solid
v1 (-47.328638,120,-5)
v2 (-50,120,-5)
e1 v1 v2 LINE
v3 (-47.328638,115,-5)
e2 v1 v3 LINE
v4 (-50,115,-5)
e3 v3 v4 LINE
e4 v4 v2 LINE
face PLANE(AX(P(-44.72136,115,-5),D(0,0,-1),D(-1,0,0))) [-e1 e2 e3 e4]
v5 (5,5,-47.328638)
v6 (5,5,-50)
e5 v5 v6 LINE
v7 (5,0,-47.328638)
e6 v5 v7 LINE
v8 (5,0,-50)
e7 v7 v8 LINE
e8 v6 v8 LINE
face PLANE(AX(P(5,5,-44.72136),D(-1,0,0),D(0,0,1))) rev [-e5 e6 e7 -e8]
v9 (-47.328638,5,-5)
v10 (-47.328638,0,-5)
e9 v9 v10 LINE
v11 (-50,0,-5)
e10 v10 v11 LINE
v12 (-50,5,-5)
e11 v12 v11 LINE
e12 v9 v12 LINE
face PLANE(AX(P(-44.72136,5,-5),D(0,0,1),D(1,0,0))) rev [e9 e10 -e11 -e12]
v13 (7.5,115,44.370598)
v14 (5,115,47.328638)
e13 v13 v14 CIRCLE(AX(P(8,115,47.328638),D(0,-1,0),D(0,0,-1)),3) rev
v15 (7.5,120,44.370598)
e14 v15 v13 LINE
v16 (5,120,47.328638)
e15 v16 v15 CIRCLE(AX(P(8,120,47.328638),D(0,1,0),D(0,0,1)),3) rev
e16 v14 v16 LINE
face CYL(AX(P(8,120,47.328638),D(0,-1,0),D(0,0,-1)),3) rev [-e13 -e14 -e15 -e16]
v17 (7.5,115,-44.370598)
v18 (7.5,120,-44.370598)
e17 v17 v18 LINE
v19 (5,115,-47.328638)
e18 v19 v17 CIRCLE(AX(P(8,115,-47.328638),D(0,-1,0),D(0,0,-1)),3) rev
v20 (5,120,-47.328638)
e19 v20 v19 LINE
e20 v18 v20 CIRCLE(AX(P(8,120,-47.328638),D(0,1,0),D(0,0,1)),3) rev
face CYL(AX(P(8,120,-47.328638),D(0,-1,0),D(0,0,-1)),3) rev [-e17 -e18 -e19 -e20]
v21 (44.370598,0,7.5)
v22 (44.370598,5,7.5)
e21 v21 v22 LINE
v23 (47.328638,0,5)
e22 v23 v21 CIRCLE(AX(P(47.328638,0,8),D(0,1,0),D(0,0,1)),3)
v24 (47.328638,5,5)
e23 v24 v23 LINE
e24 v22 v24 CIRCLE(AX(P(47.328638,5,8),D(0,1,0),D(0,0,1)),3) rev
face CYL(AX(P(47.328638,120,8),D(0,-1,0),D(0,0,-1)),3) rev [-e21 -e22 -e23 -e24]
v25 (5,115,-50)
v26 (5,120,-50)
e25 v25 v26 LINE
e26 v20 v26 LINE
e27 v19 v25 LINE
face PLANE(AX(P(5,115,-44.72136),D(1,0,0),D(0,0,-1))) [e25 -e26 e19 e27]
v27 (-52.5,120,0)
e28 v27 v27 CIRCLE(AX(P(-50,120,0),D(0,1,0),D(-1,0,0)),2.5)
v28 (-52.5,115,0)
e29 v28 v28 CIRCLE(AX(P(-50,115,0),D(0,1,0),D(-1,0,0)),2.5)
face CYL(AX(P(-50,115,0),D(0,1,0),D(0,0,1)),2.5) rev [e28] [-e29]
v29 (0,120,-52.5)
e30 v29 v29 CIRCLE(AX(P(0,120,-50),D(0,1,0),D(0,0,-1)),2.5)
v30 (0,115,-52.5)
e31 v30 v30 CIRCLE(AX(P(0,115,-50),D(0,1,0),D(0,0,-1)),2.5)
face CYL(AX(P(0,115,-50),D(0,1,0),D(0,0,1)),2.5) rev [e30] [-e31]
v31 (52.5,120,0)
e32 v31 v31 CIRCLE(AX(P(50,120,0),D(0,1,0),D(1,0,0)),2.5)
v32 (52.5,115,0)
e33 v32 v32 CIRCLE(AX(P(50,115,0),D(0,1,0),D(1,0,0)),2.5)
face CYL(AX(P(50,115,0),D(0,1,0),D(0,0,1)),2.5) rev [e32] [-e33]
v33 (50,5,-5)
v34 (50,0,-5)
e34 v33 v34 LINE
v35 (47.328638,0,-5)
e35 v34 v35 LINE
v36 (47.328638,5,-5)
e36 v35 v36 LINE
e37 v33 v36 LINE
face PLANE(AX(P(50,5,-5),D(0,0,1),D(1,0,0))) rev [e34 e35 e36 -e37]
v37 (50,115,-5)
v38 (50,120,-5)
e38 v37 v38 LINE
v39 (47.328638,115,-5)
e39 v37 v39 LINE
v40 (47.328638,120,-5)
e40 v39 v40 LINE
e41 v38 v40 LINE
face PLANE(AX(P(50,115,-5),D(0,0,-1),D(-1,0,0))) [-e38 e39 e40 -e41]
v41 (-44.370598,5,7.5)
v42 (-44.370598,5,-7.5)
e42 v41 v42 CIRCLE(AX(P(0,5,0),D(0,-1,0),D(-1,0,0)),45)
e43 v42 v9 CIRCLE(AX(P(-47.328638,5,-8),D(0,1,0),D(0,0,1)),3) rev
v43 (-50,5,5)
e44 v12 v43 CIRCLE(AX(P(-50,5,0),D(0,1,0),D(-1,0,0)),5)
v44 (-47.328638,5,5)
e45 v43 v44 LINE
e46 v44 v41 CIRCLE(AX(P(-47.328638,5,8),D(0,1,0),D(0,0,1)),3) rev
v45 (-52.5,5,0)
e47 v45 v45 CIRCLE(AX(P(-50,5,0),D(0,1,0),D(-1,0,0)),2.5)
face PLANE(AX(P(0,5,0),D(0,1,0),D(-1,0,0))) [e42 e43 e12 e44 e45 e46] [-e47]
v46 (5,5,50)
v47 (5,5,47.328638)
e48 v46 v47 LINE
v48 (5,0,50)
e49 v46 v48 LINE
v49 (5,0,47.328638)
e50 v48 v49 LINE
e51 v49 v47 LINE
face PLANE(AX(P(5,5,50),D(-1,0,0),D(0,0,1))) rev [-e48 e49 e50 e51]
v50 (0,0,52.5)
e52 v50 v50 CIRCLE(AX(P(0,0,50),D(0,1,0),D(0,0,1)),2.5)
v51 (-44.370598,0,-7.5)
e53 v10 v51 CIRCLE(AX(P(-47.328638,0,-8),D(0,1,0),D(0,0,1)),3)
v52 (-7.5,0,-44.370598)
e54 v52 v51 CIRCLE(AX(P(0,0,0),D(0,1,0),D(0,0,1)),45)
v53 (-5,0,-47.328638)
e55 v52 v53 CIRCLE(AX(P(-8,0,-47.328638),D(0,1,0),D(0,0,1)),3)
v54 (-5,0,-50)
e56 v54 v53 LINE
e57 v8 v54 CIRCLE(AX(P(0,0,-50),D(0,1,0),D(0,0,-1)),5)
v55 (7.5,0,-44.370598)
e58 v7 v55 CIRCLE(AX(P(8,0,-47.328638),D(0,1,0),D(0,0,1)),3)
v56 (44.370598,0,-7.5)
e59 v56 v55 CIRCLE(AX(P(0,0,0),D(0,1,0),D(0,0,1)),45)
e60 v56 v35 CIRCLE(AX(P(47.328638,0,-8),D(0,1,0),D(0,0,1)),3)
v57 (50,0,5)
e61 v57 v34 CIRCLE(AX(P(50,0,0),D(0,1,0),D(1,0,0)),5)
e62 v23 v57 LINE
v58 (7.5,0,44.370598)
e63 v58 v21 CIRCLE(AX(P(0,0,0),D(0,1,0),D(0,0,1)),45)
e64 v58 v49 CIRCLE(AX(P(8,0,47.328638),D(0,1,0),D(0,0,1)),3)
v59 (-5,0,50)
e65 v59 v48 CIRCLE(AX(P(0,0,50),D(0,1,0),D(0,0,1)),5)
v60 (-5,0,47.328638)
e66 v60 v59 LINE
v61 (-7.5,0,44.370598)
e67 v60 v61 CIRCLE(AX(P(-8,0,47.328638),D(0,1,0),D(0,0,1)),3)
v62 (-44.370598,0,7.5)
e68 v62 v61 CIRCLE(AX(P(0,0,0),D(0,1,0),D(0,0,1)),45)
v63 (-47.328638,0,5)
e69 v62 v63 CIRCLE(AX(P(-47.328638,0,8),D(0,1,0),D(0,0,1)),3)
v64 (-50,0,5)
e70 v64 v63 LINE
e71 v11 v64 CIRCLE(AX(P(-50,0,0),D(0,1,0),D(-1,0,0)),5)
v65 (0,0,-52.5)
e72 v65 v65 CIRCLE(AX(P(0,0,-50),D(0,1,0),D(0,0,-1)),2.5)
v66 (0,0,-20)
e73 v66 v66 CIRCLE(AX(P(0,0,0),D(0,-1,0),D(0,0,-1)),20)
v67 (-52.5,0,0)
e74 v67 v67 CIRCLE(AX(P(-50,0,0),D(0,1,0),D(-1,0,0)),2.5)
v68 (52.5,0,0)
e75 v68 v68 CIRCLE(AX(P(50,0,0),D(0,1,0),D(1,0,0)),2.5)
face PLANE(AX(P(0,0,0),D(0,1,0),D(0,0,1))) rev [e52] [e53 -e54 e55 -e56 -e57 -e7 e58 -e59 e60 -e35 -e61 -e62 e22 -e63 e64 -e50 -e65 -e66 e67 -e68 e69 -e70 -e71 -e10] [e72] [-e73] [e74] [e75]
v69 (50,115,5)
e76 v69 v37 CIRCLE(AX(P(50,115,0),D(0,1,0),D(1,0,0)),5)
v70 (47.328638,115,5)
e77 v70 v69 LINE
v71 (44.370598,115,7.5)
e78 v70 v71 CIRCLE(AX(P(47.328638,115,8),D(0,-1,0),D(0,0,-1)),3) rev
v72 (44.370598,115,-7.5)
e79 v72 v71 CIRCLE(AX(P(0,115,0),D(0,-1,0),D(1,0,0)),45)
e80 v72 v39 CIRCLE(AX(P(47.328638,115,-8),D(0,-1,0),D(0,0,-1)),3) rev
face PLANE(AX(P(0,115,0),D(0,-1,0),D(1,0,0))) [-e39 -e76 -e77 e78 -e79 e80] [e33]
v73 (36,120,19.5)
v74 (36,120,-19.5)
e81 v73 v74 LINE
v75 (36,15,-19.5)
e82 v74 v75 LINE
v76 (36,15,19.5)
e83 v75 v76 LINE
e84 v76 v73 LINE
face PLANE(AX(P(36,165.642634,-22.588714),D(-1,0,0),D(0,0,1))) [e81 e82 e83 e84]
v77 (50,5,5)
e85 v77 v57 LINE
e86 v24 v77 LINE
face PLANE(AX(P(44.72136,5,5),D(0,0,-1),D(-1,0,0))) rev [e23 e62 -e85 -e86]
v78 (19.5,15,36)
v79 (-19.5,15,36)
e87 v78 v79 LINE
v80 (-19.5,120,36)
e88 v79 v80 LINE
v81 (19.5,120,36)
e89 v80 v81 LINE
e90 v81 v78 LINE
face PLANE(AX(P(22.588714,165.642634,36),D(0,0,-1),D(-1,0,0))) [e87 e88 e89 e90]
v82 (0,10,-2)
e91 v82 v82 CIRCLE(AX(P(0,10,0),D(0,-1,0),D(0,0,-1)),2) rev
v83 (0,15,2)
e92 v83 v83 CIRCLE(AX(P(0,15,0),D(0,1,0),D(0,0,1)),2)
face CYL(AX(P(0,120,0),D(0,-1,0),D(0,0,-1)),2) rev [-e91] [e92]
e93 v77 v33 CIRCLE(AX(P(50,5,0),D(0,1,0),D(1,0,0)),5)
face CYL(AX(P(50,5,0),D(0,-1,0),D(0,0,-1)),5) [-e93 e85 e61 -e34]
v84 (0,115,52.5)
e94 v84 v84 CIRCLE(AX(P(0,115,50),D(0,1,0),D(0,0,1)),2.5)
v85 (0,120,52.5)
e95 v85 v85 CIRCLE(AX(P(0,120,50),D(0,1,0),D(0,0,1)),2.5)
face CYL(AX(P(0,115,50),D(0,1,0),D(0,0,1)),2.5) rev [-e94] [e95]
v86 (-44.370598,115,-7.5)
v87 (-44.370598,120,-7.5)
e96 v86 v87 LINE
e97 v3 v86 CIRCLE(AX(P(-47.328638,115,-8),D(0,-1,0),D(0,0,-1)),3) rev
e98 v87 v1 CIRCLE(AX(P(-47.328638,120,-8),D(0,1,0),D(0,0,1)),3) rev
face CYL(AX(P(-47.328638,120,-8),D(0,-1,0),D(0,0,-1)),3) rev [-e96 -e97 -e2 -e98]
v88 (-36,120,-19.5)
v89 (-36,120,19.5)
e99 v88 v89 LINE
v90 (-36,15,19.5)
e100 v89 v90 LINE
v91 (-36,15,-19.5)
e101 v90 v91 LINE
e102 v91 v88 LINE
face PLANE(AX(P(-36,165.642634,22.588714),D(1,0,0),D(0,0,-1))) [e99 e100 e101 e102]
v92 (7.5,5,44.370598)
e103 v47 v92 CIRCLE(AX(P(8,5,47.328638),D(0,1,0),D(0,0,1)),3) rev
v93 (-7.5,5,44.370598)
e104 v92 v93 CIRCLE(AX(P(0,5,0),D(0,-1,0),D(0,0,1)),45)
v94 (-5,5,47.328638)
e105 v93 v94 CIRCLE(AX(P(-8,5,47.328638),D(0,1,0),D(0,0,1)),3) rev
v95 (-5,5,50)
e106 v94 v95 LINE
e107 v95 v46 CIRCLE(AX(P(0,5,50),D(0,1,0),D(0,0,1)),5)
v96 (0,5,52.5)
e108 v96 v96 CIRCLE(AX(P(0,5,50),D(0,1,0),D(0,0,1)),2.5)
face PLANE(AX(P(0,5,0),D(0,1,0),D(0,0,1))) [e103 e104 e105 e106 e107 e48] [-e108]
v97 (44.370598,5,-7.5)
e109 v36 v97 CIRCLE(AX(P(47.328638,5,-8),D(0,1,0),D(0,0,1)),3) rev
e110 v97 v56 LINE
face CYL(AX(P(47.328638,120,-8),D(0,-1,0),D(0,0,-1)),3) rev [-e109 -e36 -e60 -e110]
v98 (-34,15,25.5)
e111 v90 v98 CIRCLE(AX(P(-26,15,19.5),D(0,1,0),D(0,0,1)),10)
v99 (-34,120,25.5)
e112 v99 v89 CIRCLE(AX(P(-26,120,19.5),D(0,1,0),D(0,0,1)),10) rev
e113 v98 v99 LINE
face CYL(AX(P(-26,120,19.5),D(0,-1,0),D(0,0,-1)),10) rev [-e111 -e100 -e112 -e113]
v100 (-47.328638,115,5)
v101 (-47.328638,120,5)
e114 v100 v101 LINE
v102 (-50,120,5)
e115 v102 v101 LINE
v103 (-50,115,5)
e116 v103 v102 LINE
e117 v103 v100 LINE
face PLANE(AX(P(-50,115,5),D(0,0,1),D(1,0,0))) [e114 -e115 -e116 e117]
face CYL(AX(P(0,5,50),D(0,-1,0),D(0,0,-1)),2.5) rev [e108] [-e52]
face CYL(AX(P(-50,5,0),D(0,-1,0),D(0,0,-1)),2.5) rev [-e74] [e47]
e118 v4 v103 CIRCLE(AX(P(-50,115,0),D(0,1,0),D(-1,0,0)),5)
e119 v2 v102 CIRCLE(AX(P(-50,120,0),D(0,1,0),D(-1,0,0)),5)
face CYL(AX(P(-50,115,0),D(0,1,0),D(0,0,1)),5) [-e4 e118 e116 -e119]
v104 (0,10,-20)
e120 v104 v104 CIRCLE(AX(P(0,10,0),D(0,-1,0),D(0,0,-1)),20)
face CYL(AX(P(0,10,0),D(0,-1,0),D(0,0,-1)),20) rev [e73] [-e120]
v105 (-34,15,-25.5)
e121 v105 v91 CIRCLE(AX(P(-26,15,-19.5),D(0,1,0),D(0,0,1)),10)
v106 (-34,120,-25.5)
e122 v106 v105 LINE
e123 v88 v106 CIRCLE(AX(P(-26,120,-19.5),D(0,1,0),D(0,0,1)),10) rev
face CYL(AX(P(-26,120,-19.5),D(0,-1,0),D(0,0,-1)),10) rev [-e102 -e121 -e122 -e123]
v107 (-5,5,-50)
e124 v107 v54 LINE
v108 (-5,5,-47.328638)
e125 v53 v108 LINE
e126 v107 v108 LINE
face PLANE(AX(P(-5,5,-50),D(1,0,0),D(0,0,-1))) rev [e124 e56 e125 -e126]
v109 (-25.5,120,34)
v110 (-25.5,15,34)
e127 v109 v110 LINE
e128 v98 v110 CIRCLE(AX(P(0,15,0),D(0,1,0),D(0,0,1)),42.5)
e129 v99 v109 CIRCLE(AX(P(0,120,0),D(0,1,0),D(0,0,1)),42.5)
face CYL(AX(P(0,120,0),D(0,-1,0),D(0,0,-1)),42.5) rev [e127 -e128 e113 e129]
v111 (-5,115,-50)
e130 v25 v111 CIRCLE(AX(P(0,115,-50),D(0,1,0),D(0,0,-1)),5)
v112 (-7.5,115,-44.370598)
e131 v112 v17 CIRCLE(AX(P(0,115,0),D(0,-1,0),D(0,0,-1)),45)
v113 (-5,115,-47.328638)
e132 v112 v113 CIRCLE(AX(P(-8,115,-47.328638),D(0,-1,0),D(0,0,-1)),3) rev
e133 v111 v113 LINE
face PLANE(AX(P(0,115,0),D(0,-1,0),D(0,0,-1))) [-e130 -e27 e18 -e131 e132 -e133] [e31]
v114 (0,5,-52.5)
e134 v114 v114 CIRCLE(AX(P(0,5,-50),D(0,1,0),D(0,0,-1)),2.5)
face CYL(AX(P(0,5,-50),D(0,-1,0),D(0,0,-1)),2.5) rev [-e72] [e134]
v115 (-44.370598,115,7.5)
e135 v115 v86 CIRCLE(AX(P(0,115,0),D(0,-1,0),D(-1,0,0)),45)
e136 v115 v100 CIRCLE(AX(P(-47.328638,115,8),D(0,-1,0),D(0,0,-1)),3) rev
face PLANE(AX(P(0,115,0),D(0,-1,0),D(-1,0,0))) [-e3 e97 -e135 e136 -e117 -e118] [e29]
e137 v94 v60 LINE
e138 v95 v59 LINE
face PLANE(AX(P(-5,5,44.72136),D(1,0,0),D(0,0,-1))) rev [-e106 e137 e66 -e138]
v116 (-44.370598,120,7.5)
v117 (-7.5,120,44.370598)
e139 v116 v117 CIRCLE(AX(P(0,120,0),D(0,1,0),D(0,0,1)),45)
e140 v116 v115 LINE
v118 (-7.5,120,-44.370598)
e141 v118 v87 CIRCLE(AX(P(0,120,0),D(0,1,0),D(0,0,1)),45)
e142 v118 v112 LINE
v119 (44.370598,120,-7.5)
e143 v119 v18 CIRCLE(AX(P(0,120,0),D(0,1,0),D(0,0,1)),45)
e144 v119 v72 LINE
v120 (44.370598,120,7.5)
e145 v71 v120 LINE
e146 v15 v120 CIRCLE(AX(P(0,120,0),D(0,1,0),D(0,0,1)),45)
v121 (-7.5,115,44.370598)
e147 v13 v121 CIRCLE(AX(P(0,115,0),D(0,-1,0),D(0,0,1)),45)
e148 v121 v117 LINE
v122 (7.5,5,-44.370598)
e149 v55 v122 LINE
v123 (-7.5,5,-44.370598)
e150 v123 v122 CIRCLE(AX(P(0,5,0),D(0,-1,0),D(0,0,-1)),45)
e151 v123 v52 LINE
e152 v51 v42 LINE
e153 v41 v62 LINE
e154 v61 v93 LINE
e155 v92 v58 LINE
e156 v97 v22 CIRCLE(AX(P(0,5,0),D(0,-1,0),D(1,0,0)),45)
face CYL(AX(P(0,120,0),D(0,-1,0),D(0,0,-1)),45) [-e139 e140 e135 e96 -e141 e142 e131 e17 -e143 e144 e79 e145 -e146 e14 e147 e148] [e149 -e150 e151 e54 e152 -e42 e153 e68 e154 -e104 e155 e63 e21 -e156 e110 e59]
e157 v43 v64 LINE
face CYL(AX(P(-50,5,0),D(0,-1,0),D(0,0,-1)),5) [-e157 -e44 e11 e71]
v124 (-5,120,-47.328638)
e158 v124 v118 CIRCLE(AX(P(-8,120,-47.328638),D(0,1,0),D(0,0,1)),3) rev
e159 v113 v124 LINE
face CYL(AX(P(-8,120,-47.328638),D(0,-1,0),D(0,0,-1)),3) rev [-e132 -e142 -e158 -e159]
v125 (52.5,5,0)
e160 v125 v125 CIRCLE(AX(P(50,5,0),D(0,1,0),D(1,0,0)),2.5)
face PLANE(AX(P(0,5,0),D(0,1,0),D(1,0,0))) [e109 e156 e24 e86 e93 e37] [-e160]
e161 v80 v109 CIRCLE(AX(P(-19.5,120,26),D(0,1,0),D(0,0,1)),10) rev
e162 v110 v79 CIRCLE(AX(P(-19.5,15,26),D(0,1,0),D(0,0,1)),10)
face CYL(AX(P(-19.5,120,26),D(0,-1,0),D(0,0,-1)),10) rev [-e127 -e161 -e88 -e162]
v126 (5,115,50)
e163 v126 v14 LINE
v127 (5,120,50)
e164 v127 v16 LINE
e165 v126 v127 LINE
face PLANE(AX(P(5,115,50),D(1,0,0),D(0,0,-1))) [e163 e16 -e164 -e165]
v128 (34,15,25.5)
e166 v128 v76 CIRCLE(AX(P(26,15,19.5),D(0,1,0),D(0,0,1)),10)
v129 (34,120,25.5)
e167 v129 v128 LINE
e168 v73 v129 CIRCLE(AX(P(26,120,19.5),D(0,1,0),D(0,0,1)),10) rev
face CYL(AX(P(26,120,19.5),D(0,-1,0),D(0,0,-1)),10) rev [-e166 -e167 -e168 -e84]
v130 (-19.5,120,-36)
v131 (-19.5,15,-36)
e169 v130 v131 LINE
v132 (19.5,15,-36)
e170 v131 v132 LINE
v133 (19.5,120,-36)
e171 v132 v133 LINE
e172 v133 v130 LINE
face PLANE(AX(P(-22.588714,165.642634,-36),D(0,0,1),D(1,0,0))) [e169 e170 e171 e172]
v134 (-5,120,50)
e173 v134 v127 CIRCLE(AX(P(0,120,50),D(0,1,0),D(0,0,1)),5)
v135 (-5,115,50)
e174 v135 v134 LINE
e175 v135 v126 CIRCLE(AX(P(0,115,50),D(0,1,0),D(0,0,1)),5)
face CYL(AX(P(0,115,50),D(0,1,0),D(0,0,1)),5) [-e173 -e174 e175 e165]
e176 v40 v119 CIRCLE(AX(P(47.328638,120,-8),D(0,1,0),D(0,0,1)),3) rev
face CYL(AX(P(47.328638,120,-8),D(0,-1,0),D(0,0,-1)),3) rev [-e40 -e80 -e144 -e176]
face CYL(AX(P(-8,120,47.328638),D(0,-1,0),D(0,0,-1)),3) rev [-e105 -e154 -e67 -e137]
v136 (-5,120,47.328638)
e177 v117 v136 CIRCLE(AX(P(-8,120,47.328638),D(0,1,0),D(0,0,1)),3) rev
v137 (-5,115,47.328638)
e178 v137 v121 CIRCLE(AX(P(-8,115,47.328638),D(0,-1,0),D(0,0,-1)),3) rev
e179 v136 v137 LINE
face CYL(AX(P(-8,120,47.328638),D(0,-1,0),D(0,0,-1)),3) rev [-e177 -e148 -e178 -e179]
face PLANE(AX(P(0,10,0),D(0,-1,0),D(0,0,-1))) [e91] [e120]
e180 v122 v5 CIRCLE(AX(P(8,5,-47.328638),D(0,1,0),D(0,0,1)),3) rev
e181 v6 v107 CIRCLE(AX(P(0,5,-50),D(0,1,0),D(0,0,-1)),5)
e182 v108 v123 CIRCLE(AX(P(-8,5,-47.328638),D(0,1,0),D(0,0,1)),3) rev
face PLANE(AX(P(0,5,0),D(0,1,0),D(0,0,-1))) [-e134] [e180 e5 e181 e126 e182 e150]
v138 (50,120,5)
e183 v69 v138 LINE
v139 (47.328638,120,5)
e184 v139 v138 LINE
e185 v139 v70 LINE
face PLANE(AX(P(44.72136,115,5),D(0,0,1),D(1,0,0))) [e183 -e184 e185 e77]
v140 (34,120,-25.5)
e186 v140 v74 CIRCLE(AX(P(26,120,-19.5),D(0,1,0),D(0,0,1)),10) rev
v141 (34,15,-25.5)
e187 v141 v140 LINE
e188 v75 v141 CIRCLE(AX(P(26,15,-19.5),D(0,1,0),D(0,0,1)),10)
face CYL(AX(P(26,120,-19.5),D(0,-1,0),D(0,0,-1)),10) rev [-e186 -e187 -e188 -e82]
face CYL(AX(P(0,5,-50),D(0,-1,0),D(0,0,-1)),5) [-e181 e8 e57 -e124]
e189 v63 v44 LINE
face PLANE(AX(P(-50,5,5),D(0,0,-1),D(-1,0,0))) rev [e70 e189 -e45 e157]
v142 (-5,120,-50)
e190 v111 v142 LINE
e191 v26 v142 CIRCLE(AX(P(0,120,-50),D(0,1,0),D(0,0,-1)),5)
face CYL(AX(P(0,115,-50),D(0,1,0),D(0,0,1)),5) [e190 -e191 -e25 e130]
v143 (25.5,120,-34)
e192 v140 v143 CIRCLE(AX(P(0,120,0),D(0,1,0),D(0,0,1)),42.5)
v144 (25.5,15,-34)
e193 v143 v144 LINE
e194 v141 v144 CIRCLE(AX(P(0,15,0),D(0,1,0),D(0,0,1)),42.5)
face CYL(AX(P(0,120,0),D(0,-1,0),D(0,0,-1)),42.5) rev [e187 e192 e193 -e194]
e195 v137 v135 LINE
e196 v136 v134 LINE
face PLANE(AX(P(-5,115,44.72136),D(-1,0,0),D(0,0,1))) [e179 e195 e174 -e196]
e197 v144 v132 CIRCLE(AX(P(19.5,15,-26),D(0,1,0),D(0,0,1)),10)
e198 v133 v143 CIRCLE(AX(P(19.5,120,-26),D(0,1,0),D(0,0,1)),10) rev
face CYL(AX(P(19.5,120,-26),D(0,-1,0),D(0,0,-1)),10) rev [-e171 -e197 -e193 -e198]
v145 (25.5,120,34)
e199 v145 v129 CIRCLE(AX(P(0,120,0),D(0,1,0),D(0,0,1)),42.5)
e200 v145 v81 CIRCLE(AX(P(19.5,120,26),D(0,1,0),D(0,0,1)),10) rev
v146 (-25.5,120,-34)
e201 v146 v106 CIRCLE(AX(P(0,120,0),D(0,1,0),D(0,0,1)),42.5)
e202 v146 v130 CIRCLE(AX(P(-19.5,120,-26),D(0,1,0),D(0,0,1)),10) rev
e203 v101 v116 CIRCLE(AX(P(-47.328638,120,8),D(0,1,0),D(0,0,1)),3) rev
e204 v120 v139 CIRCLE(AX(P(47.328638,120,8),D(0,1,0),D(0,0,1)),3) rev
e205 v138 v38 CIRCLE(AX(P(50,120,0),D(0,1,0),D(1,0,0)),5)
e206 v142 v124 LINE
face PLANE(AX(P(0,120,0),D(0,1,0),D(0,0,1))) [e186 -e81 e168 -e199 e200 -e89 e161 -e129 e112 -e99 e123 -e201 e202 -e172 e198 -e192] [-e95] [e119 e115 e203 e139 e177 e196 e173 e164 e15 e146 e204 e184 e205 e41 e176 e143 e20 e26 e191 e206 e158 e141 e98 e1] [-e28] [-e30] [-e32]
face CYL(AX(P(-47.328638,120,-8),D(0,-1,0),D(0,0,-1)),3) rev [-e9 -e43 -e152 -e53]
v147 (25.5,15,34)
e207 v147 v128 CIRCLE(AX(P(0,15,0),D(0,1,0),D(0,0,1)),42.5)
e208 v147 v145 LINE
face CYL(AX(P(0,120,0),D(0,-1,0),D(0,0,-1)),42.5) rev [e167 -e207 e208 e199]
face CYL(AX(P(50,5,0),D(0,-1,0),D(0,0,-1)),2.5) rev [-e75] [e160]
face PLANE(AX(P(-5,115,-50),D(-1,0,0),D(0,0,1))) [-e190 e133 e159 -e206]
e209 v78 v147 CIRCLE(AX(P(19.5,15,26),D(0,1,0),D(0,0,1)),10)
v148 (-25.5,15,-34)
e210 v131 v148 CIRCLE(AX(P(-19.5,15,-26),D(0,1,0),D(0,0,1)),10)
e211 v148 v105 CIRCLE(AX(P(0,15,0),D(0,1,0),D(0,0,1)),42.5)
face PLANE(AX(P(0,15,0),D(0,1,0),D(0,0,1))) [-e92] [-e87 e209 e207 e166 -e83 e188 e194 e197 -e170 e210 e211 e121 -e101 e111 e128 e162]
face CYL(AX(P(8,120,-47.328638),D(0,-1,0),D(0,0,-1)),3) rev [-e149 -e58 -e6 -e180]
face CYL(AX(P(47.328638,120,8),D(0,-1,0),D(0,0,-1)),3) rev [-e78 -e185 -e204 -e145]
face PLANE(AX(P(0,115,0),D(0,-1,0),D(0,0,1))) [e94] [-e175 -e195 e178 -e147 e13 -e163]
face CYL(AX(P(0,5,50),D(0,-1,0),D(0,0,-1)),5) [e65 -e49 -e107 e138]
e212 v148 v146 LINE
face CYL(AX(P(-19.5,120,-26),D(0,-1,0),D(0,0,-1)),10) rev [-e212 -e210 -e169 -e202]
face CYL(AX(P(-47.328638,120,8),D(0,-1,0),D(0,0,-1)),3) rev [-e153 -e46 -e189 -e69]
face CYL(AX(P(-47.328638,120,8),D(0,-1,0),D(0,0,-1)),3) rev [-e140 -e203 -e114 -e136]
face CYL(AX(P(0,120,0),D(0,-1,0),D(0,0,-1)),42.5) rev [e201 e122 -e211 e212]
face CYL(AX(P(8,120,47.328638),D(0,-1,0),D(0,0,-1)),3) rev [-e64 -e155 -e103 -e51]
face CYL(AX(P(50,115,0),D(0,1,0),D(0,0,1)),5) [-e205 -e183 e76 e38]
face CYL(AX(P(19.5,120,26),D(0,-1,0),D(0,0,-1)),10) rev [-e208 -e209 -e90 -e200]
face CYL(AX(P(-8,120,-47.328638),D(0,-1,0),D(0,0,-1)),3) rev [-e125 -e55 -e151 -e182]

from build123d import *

# Parameters (mm, degrees)
SKETCH1_R                = 45
SKETCH1_R_2              = 42.5
BOSS_EXTRUDE1_DEPTH      = 120
SKETCH2_R                = 2.5
BOSS_EXTRUDE2_DEPTH      = 5
FILLET2_R                = 3
CIRPATTERN1_COUNT        = 4
FILLET2_OF_CIRPATTERN1_R = 3
MIRROR1_START            = 115
MIRROR1_OUTLINE_R        = 2.5
MIRROR1_DEPTH            = 5
SKETCH1_2_R              = 42.5
BOSS_EXTRUDE4_DEPTH      = 15
SKETCH7_R                = 2
CUT_EXTRUDE1_DEPTH       = 144.003496461
SKETCH10_R               = 20
CUT_EXTRUDE5_DEPTH       = 10
BOSS_EXTRUDE3_DEPTH      = 120
CIRPATTERN2_COUNT        = 4
FILLET1_R                = 10


# Read off the part's stored shape, not the designer's step: Mirror1
with BuildPart() as part:
    # Sketch1 → Boss-Extrude1 (new body)
    with BuildSketch(Plane(origin=(0, 0, 0), x_dir=(1, 0, 0), z_dir=(0, 1, 0))):
        with Locations(Location((0, 0, 0), (0, 0, 270))):
            Circle(SKETCH1_R)
        with Locations(Location((0, 0, 0), (0, 0, 270))):
            Circle(SKETCH1_R_2, mode=Mode.SUBTRACT)
    extrude(amount=BOSS_EXTRUDE1_DEPTH)

    # Sketch2 → Boss-Extrude2 (add)
    with BuildSketch(Plane(origin=(0, 0, 0), x_dir=(1, 0, 0), z_dir=(0, 1, 0))):
        with BuildLine():
            Line((-5, -44.72135955), (-5, -50))
            ThreePointArc((-5, -50), (0, -55), (5, -50))
            Line((5, -50), (5, -44.72135955))
            ThreePointArc((5, -44.72135955), (0, -45), (-5, -44.72135955))
        make_face()
        with Locations(Location((0, -50, 0), (0, 0, 270))):
            Circle(SKETCH2_R, mode=Mode.SUBTRACT)
    boss_extrude2 = extrude(amount=BOSS_EXTRUDE2_DEPTH)

    # Fillet2
    fillet2_edges = [part.edges().sort_by_distance(p)[0] for p in [
        (5, 2.5, 44.72135955),
        (-5, 2.5, 44.72135955),
    ]]
    fillet(fillet2_edges, radius=FILLET2_R)

    # CirPattern1: Boss-Extrude2 ×4 about axis
    cirpattern1_axis = Axis((0, 0, 0), (0, 1, 0))
    for i in range(1, CIRPATTERN1_COUNT):
        add(boss_extrude2.rotate(cirpattern1_axis, i * 360 / CIRPATTERN1_COUNT))

    # Fillet2 of CirPattern1
    fillet2_of_cirpattern1_edges = [part.edges().sort_by_distance(p)[0] for p in [
        (44.72135955, 2.5, -5),
        (44.72135955, 2.5, 5),
        (-5, 2.5, -44.72135955),
        (5, 2.5, -44.72135955),
        (-44.72135955, 2.5, 5),
        (-44.72135955, 2.5, -5),
    ]]
    fillet(fillet2_of_cirpattern1_edges, radius=FILLET2_OF_CIRPATTERN1_R)

    # Mirror1 outline → Mirror1 (add)
    # profile 1 of 4: a face of its own
    with BuildSketch(Plane(origin=(0, 0, 0), x_dir=(1, 0, 0), z_dir=(0, 1, 0)).offset(MIRROR1_START)):
        with BuildLine():
            ThreePointArc((-7.5, -44.370598373), (-5.708712153, -45.392146592), (-5, -47.328638265))
            Line((-5, -47.328638265), (-5, -50))
            ThreePointArc((-5, -50), (0, -55), (5, -50))
            Line((5, -50), (5, -47.328638265))
            ThreePointArc((5, -47.328638265), (5.708712153, -45.392146592), (7.5, -44.370598373))
            ThreePointArc((7.5, -44.370598373), (0, -45), (-7.5, -44.370598373))
        make_face()
        with Locations((0, -50)):
            Circle(MIRROR1_OUTLINE_R, mode=Mode.SUBTRACT)
    # profile 2 of 4: a face of its own
    with BuildSketch(Plane(origin=(0, 0, 0), x_dir=(1, 0, 0), z_dir=(0, 1, 0)).offset(MIRROR1_START)):
        with BuildLine():
            ThreePointArc((-47.328638265, -5), (-45.392146592, -5.708712153), (-44.370598373, -7.5))
            ThreePointArc((-44.370598373, -7.5), (-45, 0), (-44.370598373, 7.5))
            ThreePointArc((-44.370598373, 7.5), (-45.392146592, 5.708712153), (-47.328638265, 5))
            Line((-47.328638265, 5), (-50, 5))
            ThreePointArc((-50, 5), (-55, 0), (-50, -5))
            Line((-50, -5), (-47.328638265, -5))
        make_face()
        with Locations((-50, 0)):
            Circle(MIRROR1_OUTLINE_R, mode=Mode.SUBTRACT)
    # profile 3 of 4: a face of its own
    with BuildSketch(Plane(origin=(0, 0, 0), x_dir=(1, 0, 0), z_dir=(0, 1, 0)).offset(MIRROR1_START)):
        with BuildLine():
            ThreePointArc((44.370598373, 7.5), (45, 0), (44.370598373, -7.5))
            ThreePointArc((44.370598373, -7.5), (45.392146592, -5.708712153), (47.328638265, -5))
            Line((47.328638265, -5), (50, -5))
            ThreePointArc((50, -5), (55, 0), (50, 5))
            Line((50, 5), (47.328638265, 5))
            ThreePointArc((47.328638265, 5), (45.392146592, 5.708712153), (44.370598373, 7.5))
        make_face()
        with Locations((50, 0)):
            Circle(MIRROR1_OUTLINE_R, mode=Mode.SUBTRACT)
    # profile 4 of 4: a face of its own
    with BuildSketch(Plane(origin=(0, 0, 0), x_dir=(1, 0, 0), z_dir=(0, 1, 0)).offset(MIRROR1_START)):
        with BuildLine():
            ThreePointArc((-5, 47.328638265), (-5.708712153, 45.392146592), (-7.5, 44.370598373))
            ThreePointArc((-7.5, 44.370598373), (0, 45), (7.5, 44.370598373))
            ThreePointArc((7.5, 44.370598373), (5.708712153, 45.392146592), (5, 47.328638265))
            Line((5, 47.328638265), (5, 50))
            ThreePointArc((5, 50), (0, 55), (-5, 50))
            Line((-5, 50), (-5, 47.328638265))
        make_face()
        with Locations((0, 50)):
            Circle(MIRROR1_OUTLINE_R, mode=Mode.SUBTRACT)
    extrude(amount=MIRROR1_DEPTH)

    # Sketch1<2> → Boss-Extrude4 (add)
    with BuildSketch(Plane(origin=(0, 0, 0), x_dir=(1, 0, 0), z_dir=(0, 1, 0))):
        with Locations(Location((0, 0, 0), (0, 0, 270))):
            Circle(SKETCH1_2_R)
    extrude(amount=BOSS_EXTRUDE4_DEPTH)

    # Sketch7 → Cut-Extrude1 (cut, through all)
    with BuildSketch(Plane.XZ):
        with Locations(Location((0, 0, 0), (0, 0, 270))):
            Circle(SKETCH7_R)
    extrude(amount=-CUT_EXTRUDE1_DEPTH, mode=Mode.SUBTRACT)

    # Sketch10 → Cut-Extrude5 (cut)
    with BuildSketch(Plane.XZ):
        with Locations(Location((0, 0, 0), (0, 0, 270))):
            Circle(SKETCH10_R)
    extrude(amount=-CUT_EXTRUDE5_DEPTH, mode=Mode.SUBTRACT)

    # Sketch6 → Boss-Extrude3 (add)
    with BuildSketch(Plane.XZ):
        with BuildLine():
            Line((-22.588713996, -36), (22.588713996, -36))
            ThreePointArc((22.588713996, -36), (0, -42.5), (-22.588713996, -36))
        make_face()
    boss_extrude3 = extrude(amount=-BOSS_EXTRUDE3_DEPTH)

    # CirPattern2: Boss-Extrude3 ×4 about axis
    cirpattern2_axis = Axis((0, 0, 0), (0, 1, 0))
    for i in range(1, CIRPATTERN2_COUNT):
        add(boss_extrude3.rotate(cirpattern2_axis, i * 360 / CIRPATTERN2_COUNT))

    # Fillet1
    fillet1_edges = [part.edges().sort_by_distance(p)[0] for p in [
        (-22.588713996, 67.5, -36),
        (22.588713996, 67.5, -36),
        (-36, 67.5, 22.588713996),
        (-36, 67.5, -22.588713996),
        (22.588713996, 67.5, 36),
        (-22.588713996, 67.5, 36),
        (36, 67.5, -22.588713996),
        (36, 67.5, 22.588713996),
    ]]
    fillet(fillet1_edges, radius=FILLET1_R)


solid = part.part
